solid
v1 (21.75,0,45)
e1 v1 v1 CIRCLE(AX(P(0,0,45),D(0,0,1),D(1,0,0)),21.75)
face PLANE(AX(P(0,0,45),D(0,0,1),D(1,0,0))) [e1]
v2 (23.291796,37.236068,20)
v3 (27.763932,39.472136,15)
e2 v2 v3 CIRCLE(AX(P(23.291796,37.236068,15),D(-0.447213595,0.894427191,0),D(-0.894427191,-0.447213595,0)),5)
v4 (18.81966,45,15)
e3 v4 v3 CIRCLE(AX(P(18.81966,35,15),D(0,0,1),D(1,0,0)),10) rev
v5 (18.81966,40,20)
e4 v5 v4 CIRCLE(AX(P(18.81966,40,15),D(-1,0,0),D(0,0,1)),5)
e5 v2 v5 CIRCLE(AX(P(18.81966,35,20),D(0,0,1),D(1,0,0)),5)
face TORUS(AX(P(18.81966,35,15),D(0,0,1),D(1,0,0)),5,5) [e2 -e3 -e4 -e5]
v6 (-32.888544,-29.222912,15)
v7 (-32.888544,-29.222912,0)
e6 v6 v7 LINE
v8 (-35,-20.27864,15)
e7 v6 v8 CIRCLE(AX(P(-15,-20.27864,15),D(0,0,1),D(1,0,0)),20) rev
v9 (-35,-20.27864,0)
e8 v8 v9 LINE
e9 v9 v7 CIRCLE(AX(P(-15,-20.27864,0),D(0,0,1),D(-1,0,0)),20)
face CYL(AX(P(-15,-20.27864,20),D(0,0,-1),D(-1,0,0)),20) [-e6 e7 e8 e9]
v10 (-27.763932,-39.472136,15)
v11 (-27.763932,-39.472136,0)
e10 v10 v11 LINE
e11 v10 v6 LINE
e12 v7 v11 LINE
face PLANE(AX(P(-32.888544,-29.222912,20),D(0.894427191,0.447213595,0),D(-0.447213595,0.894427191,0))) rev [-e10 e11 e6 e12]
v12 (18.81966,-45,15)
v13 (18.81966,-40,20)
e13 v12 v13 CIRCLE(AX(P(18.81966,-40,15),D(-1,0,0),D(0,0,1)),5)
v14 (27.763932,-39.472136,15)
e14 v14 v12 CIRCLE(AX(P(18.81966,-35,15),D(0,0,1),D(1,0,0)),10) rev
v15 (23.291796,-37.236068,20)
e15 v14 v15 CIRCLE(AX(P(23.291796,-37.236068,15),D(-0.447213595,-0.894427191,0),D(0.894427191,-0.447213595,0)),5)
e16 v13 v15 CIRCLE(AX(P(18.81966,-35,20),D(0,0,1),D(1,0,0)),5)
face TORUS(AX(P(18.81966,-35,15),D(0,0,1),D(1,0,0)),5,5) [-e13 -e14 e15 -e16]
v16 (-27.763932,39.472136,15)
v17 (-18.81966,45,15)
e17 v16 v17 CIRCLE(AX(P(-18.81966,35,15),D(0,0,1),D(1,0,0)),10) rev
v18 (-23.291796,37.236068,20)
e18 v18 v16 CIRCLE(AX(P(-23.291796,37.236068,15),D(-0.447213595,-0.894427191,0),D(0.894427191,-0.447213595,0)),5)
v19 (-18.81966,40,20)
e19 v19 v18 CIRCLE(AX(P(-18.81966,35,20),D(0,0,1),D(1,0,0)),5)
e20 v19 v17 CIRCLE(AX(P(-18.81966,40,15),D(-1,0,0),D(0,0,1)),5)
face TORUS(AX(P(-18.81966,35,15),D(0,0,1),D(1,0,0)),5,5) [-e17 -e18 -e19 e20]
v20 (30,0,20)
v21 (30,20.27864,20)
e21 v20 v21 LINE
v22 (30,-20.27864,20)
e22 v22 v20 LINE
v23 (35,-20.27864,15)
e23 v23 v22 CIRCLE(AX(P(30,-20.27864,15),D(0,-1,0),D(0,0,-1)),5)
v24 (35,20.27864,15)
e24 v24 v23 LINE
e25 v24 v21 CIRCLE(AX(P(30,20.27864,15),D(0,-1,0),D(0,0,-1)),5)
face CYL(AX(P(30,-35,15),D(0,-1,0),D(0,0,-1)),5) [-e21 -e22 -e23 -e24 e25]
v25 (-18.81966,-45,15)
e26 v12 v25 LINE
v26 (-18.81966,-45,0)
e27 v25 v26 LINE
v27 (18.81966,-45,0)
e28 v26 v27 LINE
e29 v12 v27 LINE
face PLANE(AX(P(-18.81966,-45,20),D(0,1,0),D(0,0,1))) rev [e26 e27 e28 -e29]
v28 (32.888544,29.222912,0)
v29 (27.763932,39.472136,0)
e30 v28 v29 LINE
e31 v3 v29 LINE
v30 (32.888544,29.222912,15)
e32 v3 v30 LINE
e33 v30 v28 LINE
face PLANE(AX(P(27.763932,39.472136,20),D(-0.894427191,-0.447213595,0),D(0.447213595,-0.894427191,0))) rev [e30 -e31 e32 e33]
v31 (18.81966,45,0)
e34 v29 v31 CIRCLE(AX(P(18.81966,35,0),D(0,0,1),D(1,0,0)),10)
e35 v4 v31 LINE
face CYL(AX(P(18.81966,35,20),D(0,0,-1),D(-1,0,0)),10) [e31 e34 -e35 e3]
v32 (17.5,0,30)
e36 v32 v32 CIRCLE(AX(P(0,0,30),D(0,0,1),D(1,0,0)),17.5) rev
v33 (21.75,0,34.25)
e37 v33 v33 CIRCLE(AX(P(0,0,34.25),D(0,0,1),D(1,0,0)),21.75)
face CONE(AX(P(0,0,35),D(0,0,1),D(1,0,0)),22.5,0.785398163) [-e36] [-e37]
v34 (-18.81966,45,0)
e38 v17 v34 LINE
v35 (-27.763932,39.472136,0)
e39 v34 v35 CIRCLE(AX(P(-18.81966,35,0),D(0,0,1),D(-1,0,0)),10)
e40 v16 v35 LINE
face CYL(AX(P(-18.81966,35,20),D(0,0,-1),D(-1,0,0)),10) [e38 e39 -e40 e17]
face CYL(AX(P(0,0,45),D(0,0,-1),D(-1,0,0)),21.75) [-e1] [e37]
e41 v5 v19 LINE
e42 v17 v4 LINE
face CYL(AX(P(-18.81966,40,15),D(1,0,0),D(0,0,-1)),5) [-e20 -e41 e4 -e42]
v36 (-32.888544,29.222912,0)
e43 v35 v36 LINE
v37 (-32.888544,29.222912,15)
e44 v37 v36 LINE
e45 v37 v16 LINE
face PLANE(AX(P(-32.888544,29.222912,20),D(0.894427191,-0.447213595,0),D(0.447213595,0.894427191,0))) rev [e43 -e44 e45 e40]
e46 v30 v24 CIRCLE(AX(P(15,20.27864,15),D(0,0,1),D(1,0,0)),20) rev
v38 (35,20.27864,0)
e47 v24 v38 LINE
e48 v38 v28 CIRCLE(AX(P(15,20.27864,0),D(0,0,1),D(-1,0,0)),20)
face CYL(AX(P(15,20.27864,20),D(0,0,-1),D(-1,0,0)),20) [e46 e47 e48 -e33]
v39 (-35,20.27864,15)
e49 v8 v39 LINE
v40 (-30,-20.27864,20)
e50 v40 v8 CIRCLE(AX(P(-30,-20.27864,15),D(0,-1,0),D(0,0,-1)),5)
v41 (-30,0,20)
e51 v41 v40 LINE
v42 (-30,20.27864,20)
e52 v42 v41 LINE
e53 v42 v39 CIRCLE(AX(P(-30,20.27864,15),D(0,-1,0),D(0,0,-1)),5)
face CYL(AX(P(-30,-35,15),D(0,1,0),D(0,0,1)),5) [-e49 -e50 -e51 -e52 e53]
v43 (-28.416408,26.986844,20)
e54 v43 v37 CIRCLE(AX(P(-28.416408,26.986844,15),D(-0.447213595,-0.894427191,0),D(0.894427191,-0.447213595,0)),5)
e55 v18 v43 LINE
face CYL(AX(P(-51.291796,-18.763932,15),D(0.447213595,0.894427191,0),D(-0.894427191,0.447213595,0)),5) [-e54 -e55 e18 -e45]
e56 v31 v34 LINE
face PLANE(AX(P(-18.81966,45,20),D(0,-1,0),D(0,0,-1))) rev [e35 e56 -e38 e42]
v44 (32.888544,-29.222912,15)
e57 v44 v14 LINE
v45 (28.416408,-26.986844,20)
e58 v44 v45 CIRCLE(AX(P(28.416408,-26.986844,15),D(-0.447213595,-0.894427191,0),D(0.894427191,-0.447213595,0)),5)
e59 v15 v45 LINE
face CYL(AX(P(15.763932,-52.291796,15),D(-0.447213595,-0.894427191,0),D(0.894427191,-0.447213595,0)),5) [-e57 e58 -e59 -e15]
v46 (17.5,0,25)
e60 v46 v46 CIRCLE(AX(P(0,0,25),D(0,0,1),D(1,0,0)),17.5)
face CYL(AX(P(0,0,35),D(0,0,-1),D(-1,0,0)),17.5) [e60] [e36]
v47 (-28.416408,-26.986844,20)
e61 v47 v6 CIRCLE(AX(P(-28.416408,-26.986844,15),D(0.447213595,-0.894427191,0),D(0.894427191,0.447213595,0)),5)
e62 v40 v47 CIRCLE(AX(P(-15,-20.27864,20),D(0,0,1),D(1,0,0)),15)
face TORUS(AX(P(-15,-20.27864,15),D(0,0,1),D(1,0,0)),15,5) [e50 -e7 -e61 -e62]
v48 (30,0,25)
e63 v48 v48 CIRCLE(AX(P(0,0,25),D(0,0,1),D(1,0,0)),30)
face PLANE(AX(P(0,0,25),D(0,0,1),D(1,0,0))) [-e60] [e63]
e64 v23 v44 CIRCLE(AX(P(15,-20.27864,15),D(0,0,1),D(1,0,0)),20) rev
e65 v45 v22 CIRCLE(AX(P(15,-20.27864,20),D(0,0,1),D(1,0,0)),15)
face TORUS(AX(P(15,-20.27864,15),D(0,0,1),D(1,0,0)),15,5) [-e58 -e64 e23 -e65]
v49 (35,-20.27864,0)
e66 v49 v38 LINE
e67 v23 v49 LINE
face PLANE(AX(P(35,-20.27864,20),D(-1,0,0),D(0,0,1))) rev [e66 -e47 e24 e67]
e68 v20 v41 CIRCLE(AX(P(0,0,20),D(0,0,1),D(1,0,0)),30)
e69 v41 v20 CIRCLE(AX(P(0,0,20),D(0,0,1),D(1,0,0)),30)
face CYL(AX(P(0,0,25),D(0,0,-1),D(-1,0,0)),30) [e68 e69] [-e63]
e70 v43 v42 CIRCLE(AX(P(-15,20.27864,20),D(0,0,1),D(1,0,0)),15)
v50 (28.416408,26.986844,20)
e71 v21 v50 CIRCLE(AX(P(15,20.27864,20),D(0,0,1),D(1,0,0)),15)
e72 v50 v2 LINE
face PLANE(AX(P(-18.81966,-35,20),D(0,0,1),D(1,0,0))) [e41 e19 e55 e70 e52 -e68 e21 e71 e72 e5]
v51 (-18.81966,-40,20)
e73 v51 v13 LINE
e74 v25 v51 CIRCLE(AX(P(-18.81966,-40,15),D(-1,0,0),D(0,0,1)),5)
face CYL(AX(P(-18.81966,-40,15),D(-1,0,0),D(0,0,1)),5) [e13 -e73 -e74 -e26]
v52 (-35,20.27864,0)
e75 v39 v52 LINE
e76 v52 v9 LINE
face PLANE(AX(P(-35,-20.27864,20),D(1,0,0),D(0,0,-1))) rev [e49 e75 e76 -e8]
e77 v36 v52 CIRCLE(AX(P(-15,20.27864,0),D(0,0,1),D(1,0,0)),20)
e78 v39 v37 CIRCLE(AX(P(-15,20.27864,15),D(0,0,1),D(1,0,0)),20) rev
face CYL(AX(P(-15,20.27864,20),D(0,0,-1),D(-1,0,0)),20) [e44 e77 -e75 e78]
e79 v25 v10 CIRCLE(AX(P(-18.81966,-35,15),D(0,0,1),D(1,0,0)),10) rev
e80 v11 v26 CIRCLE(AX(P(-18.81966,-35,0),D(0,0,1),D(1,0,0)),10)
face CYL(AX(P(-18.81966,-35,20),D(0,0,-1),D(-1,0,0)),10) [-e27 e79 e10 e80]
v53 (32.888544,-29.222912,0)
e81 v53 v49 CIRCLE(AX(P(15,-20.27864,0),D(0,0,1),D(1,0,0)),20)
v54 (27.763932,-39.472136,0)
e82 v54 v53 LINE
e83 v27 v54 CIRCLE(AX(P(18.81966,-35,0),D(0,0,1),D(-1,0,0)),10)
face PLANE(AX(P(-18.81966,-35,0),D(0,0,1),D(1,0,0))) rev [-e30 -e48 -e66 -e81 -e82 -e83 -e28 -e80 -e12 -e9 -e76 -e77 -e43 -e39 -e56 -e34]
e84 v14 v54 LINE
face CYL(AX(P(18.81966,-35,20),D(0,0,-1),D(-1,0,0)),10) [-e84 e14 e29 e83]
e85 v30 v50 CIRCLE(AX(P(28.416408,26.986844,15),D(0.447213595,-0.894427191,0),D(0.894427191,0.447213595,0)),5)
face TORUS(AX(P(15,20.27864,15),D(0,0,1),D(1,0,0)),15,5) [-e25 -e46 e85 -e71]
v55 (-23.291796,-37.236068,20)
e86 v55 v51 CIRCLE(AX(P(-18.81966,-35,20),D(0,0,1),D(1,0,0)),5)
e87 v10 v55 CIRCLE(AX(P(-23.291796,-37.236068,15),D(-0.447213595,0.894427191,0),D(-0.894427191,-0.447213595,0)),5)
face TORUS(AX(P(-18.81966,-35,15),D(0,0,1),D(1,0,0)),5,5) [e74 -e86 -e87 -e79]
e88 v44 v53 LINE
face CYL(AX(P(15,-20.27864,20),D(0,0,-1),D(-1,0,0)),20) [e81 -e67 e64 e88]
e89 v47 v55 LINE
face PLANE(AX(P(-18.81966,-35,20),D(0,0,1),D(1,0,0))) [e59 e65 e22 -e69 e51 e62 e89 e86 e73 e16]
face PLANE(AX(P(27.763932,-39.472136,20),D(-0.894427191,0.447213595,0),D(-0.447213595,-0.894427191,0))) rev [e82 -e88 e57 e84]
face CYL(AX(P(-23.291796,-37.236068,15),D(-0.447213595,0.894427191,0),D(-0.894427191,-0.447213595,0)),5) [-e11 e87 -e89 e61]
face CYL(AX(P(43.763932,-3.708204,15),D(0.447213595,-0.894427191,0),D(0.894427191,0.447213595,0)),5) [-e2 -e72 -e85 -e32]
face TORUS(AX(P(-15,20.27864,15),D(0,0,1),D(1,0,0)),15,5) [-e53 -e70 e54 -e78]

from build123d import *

# Parameters (mm, degrees)
BOSS_EXTRUDE1_DEPTH = 20
FILLET1_R           = 5
SKETCH2_R           = 30
BOSS_EXTRUDE2_DEPTH = 5
SKETCH3_R           = 17.5
BOSS_EXTRUDE3_DEPTH = 10
SKETCH4_R           = 21.75
BOSS_EXTRUDE4_DEPTH = 10
CHAMFER1_SIZE       = 5


with BuildPart() as part:
    # Sketch1 → Boss-Extrude1 (new body)
    with BuildSketch(Plane.XY):
        with BuildLine():
            Line((-32.88854382, 29.22291236), (-27.763932023, 39.472135955))
            ThreePointArc((-27.763932023, 39.472135955), (-24.076971234, 43.506508084), (-18.819660113, 45))
            Line((-18.819660113, 45), (18.819660113, 45))
            ThreePointArc((18.819660113, 45), (24.076971234, 43.506508084), (27.763932023, 39.472135955))
            Line((27.763932023, 39.472135955), (32.88854382, 29.22291236))
            ThreePointArc((32.88854382, 29.22291236), (34.464979789, 24.873698861), (35, 20.27864045))
            Line((35, 20.27864045), (35, -20.27864045))
            ThreePointArc((35, -20.27864045), (34.464979789, -24.873698861), (32.88854382, -29.22291236))
            Line((32.88854382, -29.22291236), (27.763932023, -39.472135955))
            ThreePointArc((27.763932023, -39.472135955), (24.076971234, -43.506508084), (18.819660113, -45))
            Line((18.819660113, -45), (-18.819660113, -45))
            ThreePointArc((-18.819660113, -45), (-24.076971234, -43.506508084), (-27.763932023, -39.472135955))
            Line((-27.763932023, -39.472135955), (-32.88854382, -29.22291236))
            ThreePointArc((-32.88854382, -29.22291236), (-34.464979789, -24.873698861), (-35, -20.27864045))
            Line((-35, -20.27864045), (-35, 20.27864045))
            ThreePointArc((-35, 20.27864045), (-34.464979789, 24.873698861), (-32.88854382, 29.22291236))
        make_face()
    extrude(amount=BOSS_EXTRUDE1_DEPTH)

    # Fillet1
    fillet1_edges = [part.edges().sort_by_distance(p)[0] for p in [
        (24.076971234, -43.506508084, 20),
        (30.326237921, -34.347524158, 20),
        (34.464979789, -24.873698861, 20),
        (35, 0, 20),
        (34.464979789, 24.873698861, 20),
        (30.326237921, 34.347524158, 20),
        (24.076971234, 43.506508084, 20),
        (0, 45, 20),
        (-24.076971234, 43.506508084, 20),
        (-30.326237921, 34.347524158, 20),
        (-24.076971234, -43.506508084, 20),
        (-34.464979789, 24.873698861, 20),
        (-35, 0, 20),
        (-34.464979789, -24.873698861, 20),
        (-30.326237921, -34.347524158, 20),
        (0, -45, 20),
    ]]
    fillet(fillet1_edges, radius=FILLET1_R)

    # Sketch2 → Boss-Extrude2 (add)
    with BuildSketch(Plane.XY.offset(20)):
        Circle(SKETCH2_R)
    extrude(amount=BOSS_EXTRUDE2_DEPTH)

    # Sketch3 → Boss-Extrude3 (add)
    with BuildSketch(Plane.XY.offset(25)):
        Circle(SKETCH3_R)
    extrude(amount=BOSS_EXTRUDE3_DEPTH)

    # Sketch4 → Boss-Extrude4 (add)
    with BuildSketch(Plane.XY.offset(35)):
        Circle(SKETCH4_R)
    extrude(amount=BOSS_EXTRUDE4_DEPTH)

    # Chamfer1
    # the kernel refuses this chamfer: 5 mm, written as the material it adds along each edge
    with BuildSketch(Plane(origin=(0, 0, 35), x_dir=(1, 0, 0), z_dir=(0, -1, 0))) as chamfer1_piece_1_section:
        Polygon((17.5 + CHAMFER1_SIZE, 0), (17.5, -CHAMFER1_SIZE), (17.5, 0), align=None)
    chamfer1_piece_1 = revolve(axis=Axis((0, 0, 35), (0, 0, 1)), mode=Mode.PRIVATE)
    chamfer1_piece_1 = chamfer1_piece_1 & Plane(origin=(0, 0, 32.136850645), x_dir=(1, 0, 0), z_dir=(0, 0, -1)) * Cylinder(21.75, 91, mode=Mode.PRIVATE)
    add(chamfer1_piece_1)


solid = part.part
